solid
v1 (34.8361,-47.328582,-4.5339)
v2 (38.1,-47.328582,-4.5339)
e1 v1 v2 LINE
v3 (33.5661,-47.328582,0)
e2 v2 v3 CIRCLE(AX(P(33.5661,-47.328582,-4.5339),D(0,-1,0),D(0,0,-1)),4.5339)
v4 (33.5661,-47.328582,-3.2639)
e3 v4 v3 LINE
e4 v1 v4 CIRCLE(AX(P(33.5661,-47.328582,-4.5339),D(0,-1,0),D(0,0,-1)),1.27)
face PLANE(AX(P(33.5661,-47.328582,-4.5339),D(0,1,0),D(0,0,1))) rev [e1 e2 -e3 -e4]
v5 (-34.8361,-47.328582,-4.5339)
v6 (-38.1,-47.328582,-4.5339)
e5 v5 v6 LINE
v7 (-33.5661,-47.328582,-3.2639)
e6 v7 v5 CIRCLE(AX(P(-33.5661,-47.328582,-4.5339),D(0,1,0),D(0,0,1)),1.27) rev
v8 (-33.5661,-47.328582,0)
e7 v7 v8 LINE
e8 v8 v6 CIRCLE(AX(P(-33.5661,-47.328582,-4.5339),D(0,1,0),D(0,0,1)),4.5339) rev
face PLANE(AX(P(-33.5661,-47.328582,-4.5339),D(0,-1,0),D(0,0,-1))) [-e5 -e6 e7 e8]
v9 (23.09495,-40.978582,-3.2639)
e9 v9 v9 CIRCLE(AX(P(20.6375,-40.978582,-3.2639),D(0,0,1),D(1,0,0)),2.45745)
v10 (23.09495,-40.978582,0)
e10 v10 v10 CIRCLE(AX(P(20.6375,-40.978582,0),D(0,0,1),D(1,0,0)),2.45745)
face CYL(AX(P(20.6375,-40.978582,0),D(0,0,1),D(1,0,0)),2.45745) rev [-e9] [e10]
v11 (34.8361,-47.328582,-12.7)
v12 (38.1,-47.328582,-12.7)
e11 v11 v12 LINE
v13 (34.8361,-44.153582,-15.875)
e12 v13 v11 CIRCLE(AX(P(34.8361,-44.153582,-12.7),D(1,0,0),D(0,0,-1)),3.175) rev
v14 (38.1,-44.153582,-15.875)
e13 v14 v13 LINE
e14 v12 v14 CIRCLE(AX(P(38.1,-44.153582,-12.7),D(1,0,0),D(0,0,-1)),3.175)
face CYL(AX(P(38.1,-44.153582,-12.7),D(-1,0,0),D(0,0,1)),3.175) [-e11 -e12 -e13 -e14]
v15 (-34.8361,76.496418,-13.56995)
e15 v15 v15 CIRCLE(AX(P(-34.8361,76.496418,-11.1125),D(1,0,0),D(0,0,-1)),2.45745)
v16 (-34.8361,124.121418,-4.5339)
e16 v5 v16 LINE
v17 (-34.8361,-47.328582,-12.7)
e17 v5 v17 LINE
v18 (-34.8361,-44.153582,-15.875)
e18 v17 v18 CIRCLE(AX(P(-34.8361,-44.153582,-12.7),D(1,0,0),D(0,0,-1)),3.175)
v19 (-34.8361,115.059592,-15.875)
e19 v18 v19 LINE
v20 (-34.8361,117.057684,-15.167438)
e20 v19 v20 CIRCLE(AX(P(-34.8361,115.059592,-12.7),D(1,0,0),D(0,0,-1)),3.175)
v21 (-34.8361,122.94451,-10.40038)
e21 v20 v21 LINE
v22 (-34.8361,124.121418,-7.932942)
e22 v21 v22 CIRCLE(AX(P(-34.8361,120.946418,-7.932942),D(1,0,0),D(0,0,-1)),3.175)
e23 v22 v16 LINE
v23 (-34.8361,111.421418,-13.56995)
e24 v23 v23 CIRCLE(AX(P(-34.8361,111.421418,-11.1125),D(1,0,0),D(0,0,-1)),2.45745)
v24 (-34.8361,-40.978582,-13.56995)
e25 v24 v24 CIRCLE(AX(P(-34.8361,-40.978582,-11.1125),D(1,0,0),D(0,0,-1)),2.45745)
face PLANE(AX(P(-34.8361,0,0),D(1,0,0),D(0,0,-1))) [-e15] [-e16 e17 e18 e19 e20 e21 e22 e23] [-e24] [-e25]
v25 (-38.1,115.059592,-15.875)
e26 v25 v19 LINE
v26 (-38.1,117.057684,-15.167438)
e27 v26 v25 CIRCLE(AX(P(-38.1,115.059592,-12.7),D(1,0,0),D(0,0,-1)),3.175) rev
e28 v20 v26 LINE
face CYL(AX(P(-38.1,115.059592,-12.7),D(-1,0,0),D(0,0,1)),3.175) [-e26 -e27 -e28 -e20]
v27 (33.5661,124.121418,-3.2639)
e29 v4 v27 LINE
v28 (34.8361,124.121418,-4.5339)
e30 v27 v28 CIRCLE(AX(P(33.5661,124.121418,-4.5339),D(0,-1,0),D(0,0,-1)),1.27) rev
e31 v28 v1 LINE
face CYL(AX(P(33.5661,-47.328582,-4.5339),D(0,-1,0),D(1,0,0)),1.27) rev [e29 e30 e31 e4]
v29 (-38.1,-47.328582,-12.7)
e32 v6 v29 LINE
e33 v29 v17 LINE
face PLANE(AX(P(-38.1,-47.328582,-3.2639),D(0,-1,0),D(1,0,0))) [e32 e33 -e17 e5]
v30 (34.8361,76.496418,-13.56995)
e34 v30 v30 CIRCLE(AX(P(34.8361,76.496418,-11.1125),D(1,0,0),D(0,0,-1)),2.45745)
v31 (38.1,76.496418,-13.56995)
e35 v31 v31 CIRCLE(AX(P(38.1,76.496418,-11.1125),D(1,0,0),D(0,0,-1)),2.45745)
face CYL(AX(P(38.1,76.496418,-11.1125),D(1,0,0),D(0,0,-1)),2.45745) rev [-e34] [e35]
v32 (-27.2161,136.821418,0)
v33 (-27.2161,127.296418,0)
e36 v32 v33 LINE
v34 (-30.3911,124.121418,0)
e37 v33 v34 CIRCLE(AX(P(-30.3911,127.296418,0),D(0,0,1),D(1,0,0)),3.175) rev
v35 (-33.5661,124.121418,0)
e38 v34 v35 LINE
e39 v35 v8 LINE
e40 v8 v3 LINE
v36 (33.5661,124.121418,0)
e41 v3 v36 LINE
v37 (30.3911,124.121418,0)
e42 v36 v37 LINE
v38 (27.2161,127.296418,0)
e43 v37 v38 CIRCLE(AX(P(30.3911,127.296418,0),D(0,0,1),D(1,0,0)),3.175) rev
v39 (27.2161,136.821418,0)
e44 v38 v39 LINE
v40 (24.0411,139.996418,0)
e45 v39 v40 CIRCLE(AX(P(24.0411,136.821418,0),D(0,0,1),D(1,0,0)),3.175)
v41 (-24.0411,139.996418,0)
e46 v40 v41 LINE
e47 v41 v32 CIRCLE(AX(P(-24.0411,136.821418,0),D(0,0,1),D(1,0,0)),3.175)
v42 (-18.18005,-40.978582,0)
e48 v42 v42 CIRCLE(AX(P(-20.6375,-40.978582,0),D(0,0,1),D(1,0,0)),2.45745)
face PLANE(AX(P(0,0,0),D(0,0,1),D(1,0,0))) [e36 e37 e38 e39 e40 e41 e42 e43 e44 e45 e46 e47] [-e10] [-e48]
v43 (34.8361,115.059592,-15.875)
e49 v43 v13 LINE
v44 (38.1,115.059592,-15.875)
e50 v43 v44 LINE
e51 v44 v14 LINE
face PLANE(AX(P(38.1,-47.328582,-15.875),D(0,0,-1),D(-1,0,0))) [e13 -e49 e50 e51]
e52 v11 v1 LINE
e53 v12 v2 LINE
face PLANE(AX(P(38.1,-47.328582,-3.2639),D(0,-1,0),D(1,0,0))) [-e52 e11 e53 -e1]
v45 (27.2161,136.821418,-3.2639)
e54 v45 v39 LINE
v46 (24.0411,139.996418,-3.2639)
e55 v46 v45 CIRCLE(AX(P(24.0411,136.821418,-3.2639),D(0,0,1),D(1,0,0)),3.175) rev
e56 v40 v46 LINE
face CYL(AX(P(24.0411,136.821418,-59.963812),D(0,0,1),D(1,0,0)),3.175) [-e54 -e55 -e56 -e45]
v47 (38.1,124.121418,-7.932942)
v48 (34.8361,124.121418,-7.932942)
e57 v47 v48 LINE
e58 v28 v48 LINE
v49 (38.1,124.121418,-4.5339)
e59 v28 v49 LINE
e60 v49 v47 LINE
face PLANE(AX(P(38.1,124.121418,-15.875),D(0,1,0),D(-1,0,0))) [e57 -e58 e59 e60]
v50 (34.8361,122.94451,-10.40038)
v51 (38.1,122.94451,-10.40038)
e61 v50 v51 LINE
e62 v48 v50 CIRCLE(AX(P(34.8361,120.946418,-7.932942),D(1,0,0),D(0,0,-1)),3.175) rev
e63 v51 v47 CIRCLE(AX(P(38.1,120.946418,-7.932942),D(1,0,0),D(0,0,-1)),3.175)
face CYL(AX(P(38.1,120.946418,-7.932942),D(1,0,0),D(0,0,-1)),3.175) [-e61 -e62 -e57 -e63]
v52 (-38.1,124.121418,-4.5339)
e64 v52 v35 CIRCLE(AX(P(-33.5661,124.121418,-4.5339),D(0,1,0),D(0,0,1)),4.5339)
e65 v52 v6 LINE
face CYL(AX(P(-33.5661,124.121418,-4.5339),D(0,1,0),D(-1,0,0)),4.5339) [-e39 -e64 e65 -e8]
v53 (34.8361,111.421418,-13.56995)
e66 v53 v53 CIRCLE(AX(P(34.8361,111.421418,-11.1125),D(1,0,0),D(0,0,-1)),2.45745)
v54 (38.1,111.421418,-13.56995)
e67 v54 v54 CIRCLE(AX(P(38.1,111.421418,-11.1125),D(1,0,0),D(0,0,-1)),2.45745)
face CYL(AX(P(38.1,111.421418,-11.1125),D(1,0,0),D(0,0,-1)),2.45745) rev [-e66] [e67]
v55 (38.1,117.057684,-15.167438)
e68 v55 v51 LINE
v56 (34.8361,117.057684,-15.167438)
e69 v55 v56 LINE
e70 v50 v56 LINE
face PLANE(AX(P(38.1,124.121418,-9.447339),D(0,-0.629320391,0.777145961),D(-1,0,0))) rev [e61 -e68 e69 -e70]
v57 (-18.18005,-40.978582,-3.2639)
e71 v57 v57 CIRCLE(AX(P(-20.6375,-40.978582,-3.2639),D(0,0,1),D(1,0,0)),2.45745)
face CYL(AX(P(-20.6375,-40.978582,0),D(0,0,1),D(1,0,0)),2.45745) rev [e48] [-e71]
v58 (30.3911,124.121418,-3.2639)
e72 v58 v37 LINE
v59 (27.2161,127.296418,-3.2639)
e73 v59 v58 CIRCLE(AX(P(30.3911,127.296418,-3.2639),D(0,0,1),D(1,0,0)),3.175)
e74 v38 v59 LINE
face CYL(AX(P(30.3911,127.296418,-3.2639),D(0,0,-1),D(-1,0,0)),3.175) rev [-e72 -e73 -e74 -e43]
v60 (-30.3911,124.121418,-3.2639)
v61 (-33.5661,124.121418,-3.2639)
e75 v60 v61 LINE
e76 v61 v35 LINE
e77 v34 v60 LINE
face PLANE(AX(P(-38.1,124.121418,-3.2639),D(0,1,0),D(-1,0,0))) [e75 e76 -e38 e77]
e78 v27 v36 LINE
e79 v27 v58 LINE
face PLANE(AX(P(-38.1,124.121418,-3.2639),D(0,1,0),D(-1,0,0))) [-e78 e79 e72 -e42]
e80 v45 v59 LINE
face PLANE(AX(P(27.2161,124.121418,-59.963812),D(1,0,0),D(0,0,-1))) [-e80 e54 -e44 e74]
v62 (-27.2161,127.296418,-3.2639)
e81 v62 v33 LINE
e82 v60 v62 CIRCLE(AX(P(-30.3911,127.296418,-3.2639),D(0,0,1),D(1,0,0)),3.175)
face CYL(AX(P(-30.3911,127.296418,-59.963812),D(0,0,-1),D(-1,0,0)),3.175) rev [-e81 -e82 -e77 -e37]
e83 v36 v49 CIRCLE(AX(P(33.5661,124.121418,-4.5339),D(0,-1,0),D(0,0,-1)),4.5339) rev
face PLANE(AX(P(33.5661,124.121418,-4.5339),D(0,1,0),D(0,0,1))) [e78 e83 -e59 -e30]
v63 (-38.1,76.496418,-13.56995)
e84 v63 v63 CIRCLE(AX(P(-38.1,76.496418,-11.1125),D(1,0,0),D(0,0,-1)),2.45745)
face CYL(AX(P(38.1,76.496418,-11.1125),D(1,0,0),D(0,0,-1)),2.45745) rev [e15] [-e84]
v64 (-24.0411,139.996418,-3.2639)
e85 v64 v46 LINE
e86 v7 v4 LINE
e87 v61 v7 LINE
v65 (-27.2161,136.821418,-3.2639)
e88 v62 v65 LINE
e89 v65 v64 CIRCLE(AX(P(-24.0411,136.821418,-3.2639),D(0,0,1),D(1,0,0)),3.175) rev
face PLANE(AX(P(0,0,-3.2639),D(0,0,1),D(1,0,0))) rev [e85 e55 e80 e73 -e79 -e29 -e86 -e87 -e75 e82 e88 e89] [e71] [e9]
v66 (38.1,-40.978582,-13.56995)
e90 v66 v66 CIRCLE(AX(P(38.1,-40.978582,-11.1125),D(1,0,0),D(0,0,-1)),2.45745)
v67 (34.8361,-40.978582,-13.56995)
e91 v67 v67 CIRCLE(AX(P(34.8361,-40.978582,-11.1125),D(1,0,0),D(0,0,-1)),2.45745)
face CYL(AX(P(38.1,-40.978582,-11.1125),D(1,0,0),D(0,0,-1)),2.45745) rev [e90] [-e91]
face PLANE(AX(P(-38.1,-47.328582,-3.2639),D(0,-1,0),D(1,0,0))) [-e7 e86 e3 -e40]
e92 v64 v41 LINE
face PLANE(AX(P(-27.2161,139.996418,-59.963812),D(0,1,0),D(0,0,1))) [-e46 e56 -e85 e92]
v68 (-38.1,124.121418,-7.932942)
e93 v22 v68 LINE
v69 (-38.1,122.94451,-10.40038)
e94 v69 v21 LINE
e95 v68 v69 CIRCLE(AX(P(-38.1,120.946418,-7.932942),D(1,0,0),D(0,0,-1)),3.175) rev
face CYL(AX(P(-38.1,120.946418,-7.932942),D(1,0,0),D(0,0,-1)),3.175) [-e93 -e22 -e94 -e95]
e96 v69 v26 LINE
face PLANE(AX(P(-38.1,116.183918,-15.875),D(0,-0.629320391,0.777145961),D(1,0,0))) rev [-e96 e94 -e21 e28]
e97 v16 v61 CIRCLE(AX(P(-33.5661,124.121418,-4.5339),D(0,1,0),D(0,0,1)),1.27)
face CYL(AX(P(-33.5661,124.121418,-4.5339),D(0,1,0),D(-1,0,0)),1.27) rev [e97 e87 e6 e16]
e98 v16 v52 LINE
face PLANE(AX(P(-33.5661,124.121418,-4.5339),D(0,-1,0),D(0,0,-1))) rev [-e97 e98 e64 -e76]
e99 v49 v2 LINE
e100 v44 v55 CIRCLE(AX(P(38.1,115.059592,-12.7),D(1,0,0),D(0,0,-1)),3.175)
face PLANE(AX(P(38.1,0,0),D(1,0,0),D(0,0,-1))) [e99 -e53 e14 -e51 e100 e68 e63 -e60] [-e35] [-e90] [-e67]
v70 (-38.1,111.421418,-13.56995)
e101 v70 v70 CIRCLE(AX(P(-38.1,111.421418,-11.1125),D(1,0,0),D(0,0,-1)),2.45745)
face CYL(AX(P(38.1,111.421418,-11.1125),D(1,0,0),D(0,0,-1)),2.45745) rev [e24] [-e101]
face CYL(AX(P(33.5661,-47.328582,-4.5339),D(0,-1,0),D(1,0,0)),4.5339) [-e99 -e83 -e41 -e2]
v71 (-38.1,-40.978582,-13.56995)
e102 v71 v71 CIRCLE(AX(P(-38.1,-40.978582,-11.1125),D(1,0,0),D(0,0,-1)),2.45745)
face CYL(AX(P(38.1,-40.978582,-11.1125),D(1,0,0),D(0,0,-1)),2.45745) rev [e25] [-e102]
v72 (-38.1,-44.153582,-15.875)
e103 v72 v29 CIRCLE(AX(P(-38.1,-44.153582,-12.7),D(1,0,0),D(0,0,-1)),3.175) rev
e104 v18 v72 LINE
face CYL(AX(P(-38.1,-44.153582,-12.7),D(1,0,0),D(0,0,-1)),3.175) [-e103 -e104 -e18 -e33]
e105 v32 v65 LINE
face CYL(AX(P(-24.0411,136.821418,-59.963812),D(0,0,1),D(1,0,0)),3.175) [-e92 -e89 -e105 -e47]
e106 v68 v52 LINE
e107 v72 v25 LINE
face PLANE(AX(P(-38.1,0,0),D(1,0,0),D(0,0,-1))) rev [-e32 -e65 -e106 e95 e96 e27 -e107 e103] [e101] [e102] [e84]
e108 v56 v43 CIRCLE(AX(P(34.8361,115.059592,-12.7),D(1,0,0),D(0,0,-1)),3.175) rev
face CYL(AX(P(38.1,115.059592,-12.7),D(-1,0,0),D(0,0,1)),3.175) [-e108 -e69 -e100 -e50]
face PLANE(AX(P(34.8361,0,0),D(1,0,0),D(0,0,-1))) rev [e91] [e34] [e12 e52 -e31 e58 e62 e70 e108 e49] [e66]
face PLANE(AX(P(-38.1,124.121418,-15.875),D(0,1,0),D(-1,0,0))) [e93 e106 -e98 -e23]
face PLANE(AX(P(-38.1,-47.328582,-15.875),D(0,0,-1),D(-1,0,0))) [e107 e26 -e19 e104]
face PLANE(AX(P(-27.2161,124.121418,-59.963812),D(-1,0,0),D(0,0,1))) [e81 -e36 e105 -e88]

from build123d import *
from OCP.BRepFilletAPI import BRepFilletAPI_MakeChamfer

# Parameters (mm, degrees)
SKETCH1_W                      = 76.2
SKETCH1_H                      = 171.45
BASE_FLANGE1_DEPTH             = 3.2639
EDGE_FLANGE1_STRIP_W           = 15.5956
EDGE_FLANGE1_STRIP_H           = 3.2639
EDGE_FLANGE1_STRIP_CUT_DEPTH   = 171.45
EDGE_FLANGE1_STRIP_2_W         = 15.5956
EDGE_FLANGE1_STRIP_2_H         = 3.2639
EDGE_FLANGE1_STRIP_CUT_2_DEPTH = 171.45
EDGE_FLANGE1_DEPTH             = 171.45
EDGE_FLANGE1_BEND_DEPTH        = 171.45
F_10_0_1935_DIAMETER_HOLE1_D   = 4.9149
SKETCH33_W                     = 54.4322
SKETCH33_H                     = 15.875
BOSS_EXTRUDE1_DEPTH            = 3.2639
CHAMFER1_SIZE                  = 7.9375
CHAMFER1_SIZE2                 = 6.427660763
F_10_0_1935_DIAMETER_HOLE2_D   = 4.9149
FILLET1_R                      = 3.175


# Sheet-metal steps are written as plain solids
with BuildPart() as part:
    # Sketch1 → Base-Flange1 (new body)
    with BuildSketch(Plane.XY):
        with Locations((0, 38.396418)):
            Rectangle(SKETCH1_W, SKETCH1_H)
    extrude(amount=-BASE_FLANGE1_DEPTH)

    # Edge-Flange1 strip (across the edge) → Edge-Flange1 strip cut (cut)
    with BuildSketch(Plane(origin=(38.1, 124.121418, -3.2639), x_dir=(-1, 0, 0), z_dir=(0, -1, 0))):
        with Locations((-3.2639, -1.63195)):
            Rectangle(EDGE_FLANGE1_STRIP_W, EDGE_FLANGE1_STRIP_H)
    extrude(amount=EDGE_FLANGE1_STRIP_CUT_DEPTH, mode=Mode.SUBTRACT)

    # Edge-Flange1 strip 2 (across the edge) → Edge-Flange1 strip cut 2 (cut)
    with BuildSketch(Plane(origin=(-38.1, -47.328582, -3.2639), x_dir=(1, 0, 0), z_dir=(0, 1, 0))):
        with Locations((-3.2639, -1.63195)):
            Rectangle(EDGE_FLANGE1_STRIP_2_W, EDGE_FLANGE1_STRIP_2_H)
    extrude(amount=EDGE_FLANGE1_STRIP_CUT_2_DEPTH, mode=Mode.SUBTRACT)

    # Edge-Flange1 section (across the edge) → Edge-Flange1 (add)
    with BuildSketch(Plane(origin=(38.1, 124.121418, -3.2639), x_dir=(-1, 0, 0), z_dir=(0, -1, 0))):
        with BuildLine():
            Line((0, 1.27), (0, 12.6111))
            Line((0, 12.6111), (3.2639, 12.6111))
            Line((3.2639, 12.6111), (3.2639, 1.27))
            ThreePointArc((3.2639, 1.27), (3.635874388, 0.371974388), (4.5339, 0))
            Line((4.5339, 0), (4.5339, -3.2639))
            ThreePointArc((4.5339, -3.2639), (1.327948565, -1.935951435), (0, 1.27))
        make_face()
    extrude(amount=EDGE_FLANGE1_DEPTH)

    # Edge-Flange1 section 2 (across the edge) → Edge-Flange1 bend (add)
    with BuildSketch(Plane(origin=(-38.1, -47.328582, -3.2639), x_dir=(1, 0, 0), z_dir=(0, 1, 0))):
        with BuildLine():
            Line((0, 1.27), (0, 12.6111))
            Line((0, 12.6111), (3.2639, 12.6111))
            Line((3.2639, 12.6111), (3.2639, 1.27))
            ThreePointArc((3.2639, 1.27), (3.635874388, 0.371974388), (4.5339, 0))
            Line((4.5339, 0), (4.5339, -3.2639))
            ThreePointArc((4.5339, -3.2639), (1.327948565, -1.935951435), (0, 1.27))
        make_face()
    extrude(amount=EDGE_FLANGE1_BEND_DEPTH)

    # #10 (0.1935) Diameter Hole1 (through all)
    with Locations(Plane(origin=(38.1, 0, 0), x_dir=(0, 0, -1), z_dir=(1, 0, 0))):
        with Locations((11.1125, 76.496418), (11.1125, -40.978582), (11.1125, 111.421418)):
            Hole(F_10_0_1935_DIAMETER_HOLE1_D / 2)

    # Sketch33 → Boss-Extrude1 (add)
    with BuildSketch(Plane.XY):
        with Locations((0, 132.058918)):
            Rectangle(SKETCH33_W, SKETCH33_H)
    extrude(amount=-BOSS_EXTRUDE1_DEPTH)

    # Chamfer1: one chamfer whose edges measure the first distance from different faces: ONE call of the kernel's chamfer builder (chamfer() names one face for all edges)
    chamfer1_edges_1 = [part.edges().sort_by_distance(p)[0] for p in [
        (36.46805, 124.121418, -15.875),
    ]]
    chamfer1_side_1 = [part.faces().sort_by_distance(p)[0] for p in [
        (36.46805, 38.396418, -15.875),
    ]]
    chamfer1_edges_2 = [part.edges().sort_by_distance(p)[0] for p in [
        (-36.46805, 124.121418, -15.875),
    ]]
    chamfer1_side_2 = [part.faces().sort_by_distance(p)[0] for p in [
        (-36.46805, 38.396418, -15.875),
    ]]
    chamfer1 = BRepFilletAPI_MakeChamfer(part.part.solid().wrapped)
    for e in chamfer1_edges_1:
        chamfer1.Add(CHAMFER1_SIZE, CHAMFER1_SIZE2, e.wrapped, chamfer1_side_1[0].wrapped)  # the first distance lies on this face
    for e in chamfer1_edges_2:
        chamfer1.Add(CHAMFER1_SIZE, CHAMFER1_SIZE2, e.wrapped, chamfer1_side_2[0].wrapped)  # the first distance lies on this face
    add(Compound.cast(chamfer1.Shape()), mode=Mode.REPLACE)

    # #10 (0.1935) Diameter Hole2 (through all)
    with Locations(Plane.XY):
        with Locations((-20.6375, -40.978582), (20.6375, -40.978582)):
            Hole(F_10_0_1935_DIAMETER_HOLE2_D / 2)

    # Fillet1
    fillet1_edges = [part.edges().sort_by_distance(p)[0] for p in [
        (-27.2161, 124.121418, -1.63195),
        (-27.2161, 139.996418, -1.63195),
        (27.2161, 139.996418, -1.63195),
        (27.2161, 124.121418, -1.63195),
        (-36.46805, 116.183918, -15.875),
        (-36.46805, 124.121418, -9.447339237),
        (36.46805, 124.121418, -9.447339237),
        (36.46805, 116.183918, -15.875),
        (36.46805, -47.328582, -15.875),
        (-36.46805, -47.328582, -15.875),
    ]]
    fillet(fillet1_edges, radius=FILLET1_R)


solid = part.part
